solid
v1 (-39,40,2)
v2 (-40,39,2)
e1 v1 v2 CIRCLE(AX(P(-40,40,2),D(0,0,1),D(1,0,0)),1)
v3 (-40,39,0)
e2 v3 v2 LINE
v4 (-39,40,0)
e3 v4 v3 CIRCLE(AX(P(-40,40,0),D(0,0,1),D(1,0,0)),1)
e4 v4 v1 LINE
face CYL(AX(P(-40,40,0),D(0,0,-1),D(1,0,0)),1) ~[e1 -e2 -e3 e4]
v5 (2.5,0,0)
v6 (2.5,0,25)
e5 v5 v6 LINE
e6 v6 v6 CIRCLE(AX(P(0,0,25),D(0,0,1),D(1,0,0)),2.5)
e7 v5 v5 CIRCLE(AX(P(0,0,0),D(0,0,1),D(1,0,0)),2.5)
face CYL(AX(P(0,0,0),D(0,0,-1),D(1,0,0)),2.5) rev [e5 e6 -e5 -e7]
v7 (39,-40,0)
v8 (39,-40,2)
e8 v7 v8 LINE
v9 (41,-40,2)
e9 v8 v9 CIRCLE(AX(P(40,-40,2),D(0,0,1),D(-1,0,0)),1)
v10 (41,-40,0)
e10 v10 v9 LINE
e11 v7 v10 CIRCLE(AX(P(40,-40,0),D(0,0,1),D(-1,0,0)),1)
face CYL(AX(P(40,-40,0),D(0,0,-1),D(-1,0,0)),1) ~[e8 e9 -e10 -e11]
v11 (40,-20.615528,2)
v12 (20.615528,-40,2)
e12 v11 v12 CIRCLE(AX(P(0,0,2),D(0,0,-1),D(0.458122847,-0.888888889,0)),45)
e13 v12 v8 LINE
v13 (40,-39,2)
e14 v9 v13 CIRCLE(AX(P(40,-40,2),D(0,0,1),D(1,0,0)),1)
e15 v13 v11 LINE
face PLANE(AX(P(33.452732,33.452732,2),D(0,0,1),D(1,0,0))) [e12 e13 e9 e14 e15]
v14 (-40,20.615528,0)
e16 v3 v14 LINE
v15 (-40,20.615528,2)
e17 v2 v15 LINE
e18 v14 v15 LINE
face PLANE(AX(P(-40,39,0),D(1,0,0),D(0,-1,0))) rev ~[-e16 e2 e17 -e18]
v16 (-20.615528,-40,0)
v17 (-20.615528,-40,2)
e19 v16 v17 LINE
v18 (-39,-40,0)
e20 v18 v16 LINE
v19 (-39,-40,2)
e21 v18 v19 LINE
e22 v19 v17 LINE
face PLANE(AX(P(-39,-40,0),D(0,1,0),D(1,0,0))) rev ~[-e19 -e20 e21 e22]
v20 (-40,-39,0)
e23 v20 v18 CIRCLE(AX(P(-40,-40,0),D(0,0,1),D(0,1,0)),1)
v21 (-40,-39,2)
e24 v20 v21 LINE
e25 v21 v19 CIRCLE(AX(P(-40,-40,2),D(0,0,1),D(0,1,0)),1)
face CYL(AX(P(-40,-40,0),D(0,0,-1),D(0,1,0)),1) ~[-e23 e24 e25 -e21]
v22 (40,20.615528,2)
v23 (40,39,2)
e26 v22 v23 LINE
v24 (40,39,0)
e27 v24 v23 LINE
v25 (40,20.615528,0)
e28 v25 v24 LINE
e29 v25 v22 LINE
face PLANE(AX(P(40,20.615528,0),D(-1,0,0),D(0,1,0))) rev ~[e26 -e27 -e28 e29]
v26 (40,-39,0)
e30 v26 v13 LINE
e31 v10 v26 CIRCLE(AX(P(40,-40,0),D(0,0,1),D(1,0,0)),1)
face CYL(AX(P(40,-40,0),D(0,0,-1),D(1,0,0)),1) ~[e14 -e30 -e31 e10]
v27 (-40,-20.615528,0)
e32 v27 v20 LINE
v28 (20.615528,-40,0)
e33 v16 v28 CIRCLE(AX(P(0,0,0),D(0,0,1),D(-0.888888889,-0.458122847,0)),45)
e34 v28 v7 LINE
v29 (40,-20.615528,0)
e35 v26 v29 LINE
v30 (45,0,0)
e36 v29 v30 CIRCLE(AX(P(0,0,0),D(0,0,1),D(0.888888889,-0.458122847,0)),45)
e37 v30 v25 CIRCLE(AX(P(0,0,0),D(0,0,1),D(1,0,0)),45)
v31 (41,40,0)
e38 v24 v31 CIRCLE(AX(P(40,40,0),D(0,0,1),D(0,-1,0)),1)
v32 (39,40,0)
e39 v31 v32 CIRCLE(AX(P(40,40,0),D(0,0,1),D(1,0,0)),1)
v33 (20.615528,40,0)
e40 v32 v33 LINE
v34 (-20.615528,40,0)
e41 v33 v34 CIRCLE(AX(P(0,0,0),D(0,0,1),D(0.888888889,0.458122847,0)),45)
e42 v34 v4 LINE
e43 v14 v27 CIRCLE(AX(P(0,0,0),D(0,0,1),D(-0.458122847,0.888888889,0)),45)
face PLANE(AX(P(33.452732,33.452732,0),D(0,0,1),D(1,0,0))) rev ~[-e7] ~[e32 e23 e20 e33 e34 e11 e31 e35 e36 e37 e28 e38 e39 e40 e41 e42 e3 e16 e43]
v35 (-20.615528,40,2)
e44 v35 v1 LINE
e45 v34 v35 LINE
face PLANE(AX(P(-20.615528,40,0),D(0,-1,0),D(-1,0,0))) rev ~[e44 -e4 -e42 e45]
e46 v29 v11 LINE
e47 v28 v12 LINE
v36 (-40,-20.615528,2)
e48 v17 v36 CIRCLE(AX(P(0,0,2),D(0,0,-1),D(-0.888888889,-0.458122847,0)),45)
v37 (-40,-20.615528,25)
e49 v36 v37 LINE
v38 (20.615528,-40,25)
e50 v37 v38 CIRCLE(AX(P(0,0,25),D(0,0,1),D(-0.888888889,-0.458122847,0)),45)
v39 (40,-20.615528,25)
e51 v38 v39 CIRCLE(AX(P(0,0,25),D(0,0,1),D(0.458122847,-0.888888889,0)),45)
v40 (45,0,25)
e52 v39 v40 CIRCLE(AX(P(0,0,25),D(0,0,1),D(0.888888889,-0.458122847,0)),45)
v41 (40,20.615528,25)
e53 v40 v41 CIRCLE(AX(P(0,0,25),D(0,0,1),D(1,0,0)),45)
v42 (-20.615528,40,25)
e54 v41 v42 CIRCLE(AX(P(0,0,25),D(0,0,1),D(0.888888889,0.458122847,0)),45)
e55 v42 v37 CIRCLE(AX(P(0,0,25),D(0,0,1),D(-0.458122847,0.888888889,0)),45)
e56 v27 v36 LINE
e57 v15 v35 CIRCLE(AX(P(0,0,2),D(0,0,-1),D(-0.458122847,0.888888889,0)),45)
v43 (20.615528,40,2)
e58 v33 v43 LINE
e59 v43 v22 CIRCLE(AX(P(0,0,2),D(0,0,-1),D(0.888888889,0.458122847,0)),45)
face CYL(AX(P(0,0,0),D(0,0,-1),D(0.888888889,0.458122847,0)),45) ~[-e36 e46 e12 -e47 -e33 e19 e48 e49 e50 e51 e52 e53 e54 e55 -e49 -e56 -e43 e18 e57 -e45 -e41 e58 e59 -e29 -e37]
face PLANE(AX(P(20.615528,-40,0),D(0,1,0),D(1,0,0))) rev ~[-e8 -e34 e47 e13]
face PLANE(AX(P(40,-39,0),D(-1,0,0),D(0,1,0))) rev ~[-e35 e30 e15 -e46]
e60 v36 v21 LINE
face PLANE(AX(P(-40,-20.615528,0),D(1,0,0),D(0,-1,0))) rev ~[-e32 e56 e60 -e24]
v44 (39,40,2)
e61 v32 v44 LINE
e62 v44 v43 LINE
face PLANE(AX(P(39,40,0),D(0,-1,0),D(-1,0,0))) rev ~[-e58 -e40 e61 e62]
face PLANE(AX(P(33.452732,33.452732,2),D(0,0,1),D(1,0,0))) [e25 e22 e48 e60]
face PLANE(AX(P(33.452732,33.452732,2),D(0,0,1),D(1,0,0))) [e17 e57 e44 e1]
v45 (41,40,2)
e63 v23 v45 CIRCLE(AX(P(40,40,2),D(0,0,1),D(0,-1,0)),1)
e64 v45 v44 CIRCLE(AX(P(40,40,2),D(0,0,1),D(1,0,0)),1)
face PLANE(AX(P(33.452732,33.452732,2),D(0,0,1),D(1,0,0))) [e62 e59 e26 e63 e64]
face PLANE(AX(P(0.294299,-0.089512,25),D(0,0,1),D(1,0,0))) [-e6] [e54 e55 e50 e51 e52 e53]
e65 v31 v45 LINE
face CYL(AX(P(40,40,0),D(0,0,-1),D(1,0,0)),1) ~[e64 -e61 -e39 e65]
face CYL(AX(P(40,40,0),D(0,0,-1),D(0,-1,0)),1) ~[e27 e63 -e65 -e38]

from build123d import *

# Parameters (mm, degrees)
F0_R     = 2.5
F1_DEPTH = 2
F2_DEPTH = 25


# Not quite as in the source:
# - a feature names something its author has since deleted; it is built from what else it names


with BuildPart() as f1:
    # F0 (on Top) → F1 (new body)
    with BuildSketch(Plane.XY):
        with BuildLine():
            ThreePointArc((40, 39), (39.2928932188, 39.2928932188), (39, 40))
            Line((39, 40), (20.6155281281, 40))
            ThreePointArc((20.6155281281, 40), (31.8198051534, 31.8198051534), (40, 20.6155281281))
            Line((40, 20.6155281281), (40, 39))
        make_face()
        with BuildLine():
            ThreePointArc((-40, 20.6155281281), (-31.8198051534, 31.8198051534), (-20.6155281281, 40))
            Line((-20.6155281281, 40), (-39, 40))
            ThreePointArc((-39, 40), (-39.2928932188, 39.2928932188), (-40, 39))
            Line((-40, 39), (-40, 20.6155281281))
        make_face()
        with BuildLine():
            ThreePointArc((-20.6155281281, -40), (-31.8198051534, -31.8198051534), (-40, -20.6155281281))
            Line((-40, -20.6155281281), (-40, -39))
            ThreePointArc((-40, -39), (-39.2928932188, -39.2928932188), (-39, -40))
            Line((-39, -40), (-20.6155281281, -40))
        make_face()
        with BuildLine():
            Line((40, -39), (40, -20.6155281281))
            ThreePointArc((40, -20.6155281281), (31.8198051534, -31.8198051534), (20.6155281281, -40))
            Line((20.6155281281, -40), (39, -40))
            ThreePointArc((39, -40), (39.2928932188, -39.2928932188), (40, -39))
        make_face()
        with BuildLine():
            ThreePointArc((40, 20.6155281281), (31.8198051534, 31.8198051534), (20.6155281281, 40))
            ThreePointArc((20.6155281281, 40), (0, 45), (-20.6155281281, 40))
            ThreePointArc((-20.6155281281, 40), (-31.8198051534, 31.8198051534), (-40, 20.6155281281))
            ThreePointArc((-40, 20.6155281281), (-45, 0), (-40, -20.6155281281))
            ThreePointArc((-40, -20.6155281281), (-31.8198051534, -31.8198051534), (-20.6155281281, -40))
            ThreePointArc((-20.6155281281, -40), (0, -45), (20.6155281281, -40))
            ThreePointArc((20.6155281281, -40), (31.8198051534, -31.8198051534), (40, -20.6155281281))
            ThreePointArc((40, -20.6155281281), (43.7321392113, -10.6066017178), (45, 0))
            ThreePointArc((45, 0), (43.7321392113, 10.6066017178), (40, 20.6155281281))
        make_face()
        Circle(F0_R, mode=Mode.SUBTRACT)
        with BuildLine():
            Line((-40, 40), (-39, 40))
            ThreePointArc((-39, 40), (-40.7071067812, 40.7071067812), (-40, 39))
            Line((-40, 39), (-40, 40))
        make_face()
        with BuildLine():
            ThreePointArc((-40, 39), (-39.2928932188, 39.2928932188), (-39, 40))
            Line((-39, 40), (-40, 40))
            Line((-40, 40), (-40, 39))
        make_face()
        with BuildLine():
            Line((40, 40), (39, 40))
            ThreePointArc((39, 40), (39.2928932188, 39.2928932188), (40, 39))
            Line((40, 39), (40, 40))
        make_face()
        with BuildLine():
            ThreePointArc((40, 39), (40.7071067812, 39.2928932188), (41, 40))
            ThreePointArc((41, 40), (40, 41), (39, 40))
            Line((39, 40), (40, 40))
            Line((40, 40), (40, 39))
        make_face()
        with BuildLine():
            ThreePointArc((41, -40), (40.7071067812, -39.2928932188), (40, -39))
            Line((40, -39), (40, -40))
            Line((40, -40), (39, -40))
            ThreePointArc((39, -40), (40, -41), (41, -40))
        make_face()
        with BuildLine():
            Line((40, -40), (40, -39))
            ThreePointArc((40, -39), (39.2928932188, -39.2928932188), (39, -40))
            Line((39, -40), (40, -40))
        make_face()
        with BuildLine():
            Line((-40, -40), (-40, -39))
            ThreePointArc((-40, -39), (-40.7071067812, -40.7071067812), (-39, -40))
            Line((-39, -40), (-40, -40))
        make_face()
        with BuildLine():
            ThreePointArc((-39, -40), (-39.2928932188, -39.2928932188), (-40, -39))
            Line((-40, -39), (-40, -40))
            Line((-40, -40), (-39, -40))
        make_face()
    extrude(amount=F1_DEPTH)

    # F0 (on Top) → F2 (join)
    with BuildSketch(Plane.XY):
        with BuildLine():
            ThreePointArc((40, 20.6155281281), (31.8198051534, 31.8198051534), (20.6155281281, 40))
            ThreePointArc((20.6155281281, 40), (0, 45), (-20.6155281281, 40))
            ThreePointArc((-20.6155281281, 40), (-31.8198051534, 31.8198051534), (-40, 20.6155281281))
            ThreePointArc((-40, 20.6155281281), (-45, 0), (-40, -20.6155281281))
            ThreePointArc((-40, -20.6155281281), (-31.8198051534, -31.8198051534), (-20.6155281281, -40))
            ThreePointArc((-20.6155281281, -40), (0, -45), (20.6155281281, -40))
            ThreePointArc((20.6155281281, -40), (31.8198051534, -31.8198051534), (40, -20.6155281281))
            ThreePointArc((40, -20.6155281281), (43.7321392113, -10.6066017178), (45, 0))
            ThreePointArc((45, 0), (43.7321392113, 10.6066017178), (40, 20.6155281281))
        make_face()
        Circle(F0_R, mode=Mode.SUBTRACT)
    extrude(amount=F2_DEPTH)


solid = f1.part
